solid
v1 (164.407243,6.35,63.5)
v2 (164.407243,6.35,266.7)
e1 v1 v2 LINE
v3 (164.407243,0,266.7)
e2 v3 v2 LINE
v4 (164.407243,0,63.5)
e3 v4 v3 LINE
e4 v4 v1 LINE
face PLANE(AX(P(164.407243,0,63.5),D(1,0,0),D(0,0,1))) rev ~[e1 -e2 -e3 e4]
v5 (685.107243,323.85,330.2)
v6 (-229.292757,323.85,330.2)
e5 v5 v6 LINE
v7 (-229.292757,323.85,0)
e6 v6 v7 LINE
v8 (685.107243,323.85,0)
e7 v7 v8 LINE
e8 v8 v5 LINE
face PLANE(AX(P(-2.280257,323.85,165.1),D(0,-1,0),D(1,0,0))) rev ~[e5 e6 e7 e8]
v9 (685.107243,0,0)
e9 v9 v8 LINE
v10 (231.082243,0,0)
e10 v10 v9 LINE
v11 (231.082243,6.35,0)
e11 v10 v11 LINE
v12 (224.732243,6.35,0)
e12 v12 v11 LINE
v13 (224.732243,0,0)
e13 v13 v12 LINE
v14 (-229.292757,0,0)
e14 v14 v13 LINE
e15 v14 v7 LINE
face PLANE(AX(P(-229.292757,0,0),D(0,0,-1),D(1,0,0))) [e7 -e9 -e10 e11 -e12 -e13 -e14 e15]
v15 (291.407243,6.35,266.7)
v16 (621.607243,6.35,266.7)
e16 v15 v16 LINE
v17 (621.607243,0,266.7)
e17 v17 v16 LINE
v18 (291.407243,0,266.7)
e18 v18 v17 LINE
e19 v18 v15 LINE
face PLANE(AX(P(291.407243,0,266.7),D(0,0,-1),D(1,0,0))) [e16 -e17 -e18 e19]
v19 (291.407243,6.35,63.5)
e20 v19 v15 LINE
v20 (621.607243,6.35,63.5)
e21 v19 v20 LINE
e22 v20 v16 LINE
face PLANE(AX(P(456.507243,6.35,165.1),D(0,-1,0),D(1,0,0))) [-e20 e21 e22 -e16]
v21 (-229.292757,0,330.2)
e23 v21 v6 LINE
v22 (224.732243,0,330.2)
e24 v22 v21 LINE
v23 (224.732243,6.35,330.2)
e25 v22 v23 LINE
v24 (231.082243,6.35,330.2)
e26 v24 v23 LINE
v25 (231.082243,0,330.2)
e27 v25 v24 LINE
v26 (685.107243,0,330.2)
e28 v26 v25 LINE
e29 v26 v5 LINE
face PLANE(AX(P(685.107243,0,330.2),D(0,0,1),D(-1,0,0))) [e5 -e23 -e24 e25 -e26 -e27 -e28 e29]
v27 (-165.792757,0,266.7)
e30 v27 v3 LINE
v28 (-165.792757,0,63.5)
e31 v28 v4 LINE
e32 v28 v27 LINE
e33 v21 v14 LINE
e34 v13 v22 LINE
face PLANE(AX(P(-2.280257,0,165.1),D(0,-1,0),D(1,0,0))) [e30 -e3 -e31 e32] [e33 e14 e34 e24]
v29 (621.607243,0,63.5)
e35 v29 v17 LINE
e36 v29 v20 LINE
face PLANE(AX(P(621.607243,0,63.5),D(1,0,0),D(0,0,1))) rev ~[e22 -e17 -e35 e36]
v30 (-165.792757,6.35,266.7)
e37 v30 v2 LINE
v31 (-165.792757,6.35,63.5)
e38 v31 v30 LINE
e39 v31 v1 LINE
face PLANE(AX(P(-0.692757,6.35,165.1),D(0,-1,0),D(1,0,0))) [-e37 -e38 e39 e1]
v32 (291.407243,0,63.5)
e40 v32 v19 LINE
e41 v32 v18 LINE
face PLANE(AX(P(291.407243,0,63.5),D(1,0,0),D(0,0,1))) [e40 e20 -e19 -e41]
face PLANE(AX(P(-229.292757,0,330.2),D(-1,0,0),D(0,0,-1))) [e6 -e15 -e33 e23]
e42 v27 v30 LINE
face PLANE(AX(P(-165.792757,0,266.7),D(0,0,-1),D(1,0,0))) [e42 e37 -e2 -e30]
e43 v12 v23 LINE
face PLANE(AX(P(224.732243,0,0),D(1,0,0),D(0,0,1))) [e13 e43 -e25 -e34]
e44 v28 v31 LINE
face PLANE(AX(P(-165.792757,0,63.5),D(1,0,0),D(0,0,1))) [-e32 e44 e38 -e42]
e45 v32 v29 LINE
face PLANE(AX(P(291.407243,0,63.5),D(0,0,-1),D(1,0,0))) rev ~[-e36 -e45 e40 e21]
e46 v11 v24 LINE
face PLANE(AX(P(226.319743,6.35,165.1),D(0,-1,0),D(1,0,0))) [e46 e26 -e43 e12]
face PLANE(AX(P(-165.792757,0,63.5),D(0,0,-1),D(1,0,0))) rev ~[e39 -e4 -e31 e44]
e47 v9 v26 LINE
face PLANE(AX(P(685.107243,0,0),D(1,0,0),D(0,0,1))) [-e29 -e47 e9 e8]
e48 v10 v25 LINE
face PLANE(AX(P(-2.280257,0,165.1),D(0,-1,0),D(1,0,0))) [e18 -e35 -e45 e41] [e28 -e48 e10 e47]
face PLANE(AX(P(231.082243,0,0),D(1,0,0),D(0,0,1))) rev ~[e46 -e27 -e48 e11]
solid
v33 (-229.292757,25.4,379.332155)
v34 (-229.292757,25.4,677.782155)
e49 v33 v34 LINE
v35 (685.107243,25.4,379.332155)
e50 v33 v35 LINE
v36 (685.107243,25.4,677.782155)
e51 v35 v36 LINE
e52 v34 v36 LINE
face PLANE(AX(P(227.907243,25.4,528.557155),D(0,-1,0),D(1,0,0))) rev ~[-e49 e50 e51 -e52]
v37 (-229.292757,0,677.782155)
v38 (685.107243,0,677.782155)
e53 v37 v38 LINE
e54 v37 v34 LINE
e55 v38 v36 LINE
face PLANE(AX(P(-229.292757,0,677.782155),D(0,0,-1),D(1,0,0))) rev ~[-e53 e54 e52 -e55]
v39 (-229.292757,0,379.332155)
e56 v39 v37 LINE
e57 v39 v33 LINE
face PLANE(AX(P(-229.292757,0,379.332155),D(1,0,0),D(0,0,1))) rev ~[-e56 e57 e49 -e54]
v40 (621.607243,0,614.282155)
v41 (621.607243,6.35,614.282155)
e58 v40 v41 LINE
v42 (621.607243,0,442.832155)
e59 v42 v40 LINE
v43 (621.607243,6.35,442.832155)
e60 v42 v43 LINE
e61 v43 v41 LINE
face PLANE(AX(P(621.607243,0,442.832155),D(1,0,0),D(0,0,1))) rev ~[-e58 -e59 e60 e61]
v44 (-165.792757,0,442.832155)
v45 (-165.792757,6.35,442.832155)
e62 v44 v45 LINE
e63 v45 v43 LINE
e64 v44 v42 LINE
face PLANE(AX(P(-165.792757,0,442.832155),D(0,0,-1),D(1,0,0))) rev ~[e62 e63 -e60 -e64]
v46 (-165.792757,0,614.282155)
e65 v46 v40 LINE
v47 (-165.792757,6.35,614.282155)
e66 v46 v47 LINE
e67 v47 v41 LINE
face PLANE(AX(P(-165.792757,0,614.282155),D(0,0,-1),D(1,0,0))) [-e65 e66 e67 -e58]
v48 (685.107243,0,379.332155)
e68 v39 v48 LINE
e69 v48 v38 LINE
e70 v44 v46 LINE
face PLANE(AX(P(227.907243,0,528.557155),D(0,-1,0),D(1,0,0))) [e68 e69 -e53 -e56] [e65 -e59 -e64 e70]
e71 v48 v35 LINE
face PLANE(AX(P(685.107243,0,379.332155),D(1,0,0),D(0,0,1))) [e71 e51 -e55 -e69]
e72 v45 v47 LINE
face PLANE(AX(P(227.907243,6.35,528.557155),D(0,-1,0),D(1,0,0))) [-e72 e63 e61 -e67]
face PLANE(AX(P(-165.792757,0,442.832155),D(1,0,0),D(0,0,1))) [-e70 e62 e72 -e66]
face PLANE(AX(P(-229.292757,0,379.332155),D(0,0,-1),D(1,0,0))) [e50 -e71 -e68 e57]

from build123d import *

# Parameters (mm, degrees)
F0_W     = 330.2
F0_H     = 203.2
F0_W_2   = 3.175
F0_H_2   = 330.2
F1_DEPTH = 323.85
F2_DEPTH = 6.35
F0_W_3   = 914.4
F0_H_3   = 298.45
F0_W_4   = 787.4
F0_H_4   = 171.45
F3_DEPTH = 25.4
F4_DEPTH = 6.35


# Not quite as in the source:
# - a feature names something its author has since deleted; it is built from what else it names


with BuildPart() as f1:
    # F0 (on Front) → F1 (new body)
    with BuildSketch(Plane.XZ):
        Polygon((-229.2927574873, 0), (224.7322425127, 0), (224.7322425127, 330.2), (100.9072425127, 330.2), (-229.2927574873, 330.2), align=None)
        with Locations((-0.6927574873, 165.1)):
            Rectangle(F0_W, F0_H, mode=Mode.SUBTRACT)
        Polygon((231.0822425127, 330.2), (231.0822425127, 0), (685.1072425127, 0), (685.1072425127, 330.2), (354.9072425127, 330.2), align=None)
        with Locations((456.5072425127, 165.1)):
            Rectangle(F0_W, F0_H, mode=Mode.SUBTRACT)
        with Locations((-0.6927574873, 165.1)):
            Rectangle(F0_W, F0_H)
        with Locations((456.5072425127, 165.1)):
            Rectangle(F0_W, F0_H)
        with Locations((226.3197425127, 165.1)):
            Rectangle(F0_W_2, F0_H_2)
        with Locations((229.4947425127, 165.1)):
            Rectangle(F0_W_2, F0_H_2)
    extrude(amount=-F1_DEPTH)

    # F0 (on Front) → F2 (cut)
    with BuildSketch(Plane.XZ):
        with Locations((226.3197425127, 165.1)):
            Rectangle(F0_W_2, F0_H_2)
        with Locations((229.4947425127, 165.1)):
            Rectangle(F0_W_2, F0_H_2)
        with Locations((-0.6927574873, 165.1)):
            Rectangle(F0_W, F0_H)
        with Locations((456.5072425127, 165.1)):
            Rectangle(F0_W, F0_H)
    extrude(amount=-F2_DEPTH, mode=Mode.SUBTRACT)


with BuildPart() as f3:
    # F0 (on Front) → F3 (new body)
    with BuildSketch(Plane.XZ):
        with Locations((227.9072425127, 528.5571549892)):
            Rectangle(F0_W_3, F0_H_3)
        with Locations((227.9072425127, 528.5571549892)):
            Rectangle(F0_W_4, F0_H_4, mode=Mode.SUBTRACT)
        with Locations((227.9072425127, 528.5571549892)):
            Rectangle(F0_W_4, F0_H_4)
    extrude(amount=-F3_DEPTH)

    # F0 (on Front) → F4 (cut)
    with BuildSketch(Plane.XZ):
        with Locations((227.9072425127, 528.5571549892)):
            Rectangle(F0_W_4, F0_H_4)
    extrude(amount=-F4_DEPTH, mode=Mode.SUBTRACT)


solid = Compound([f1.part, f3.part])
